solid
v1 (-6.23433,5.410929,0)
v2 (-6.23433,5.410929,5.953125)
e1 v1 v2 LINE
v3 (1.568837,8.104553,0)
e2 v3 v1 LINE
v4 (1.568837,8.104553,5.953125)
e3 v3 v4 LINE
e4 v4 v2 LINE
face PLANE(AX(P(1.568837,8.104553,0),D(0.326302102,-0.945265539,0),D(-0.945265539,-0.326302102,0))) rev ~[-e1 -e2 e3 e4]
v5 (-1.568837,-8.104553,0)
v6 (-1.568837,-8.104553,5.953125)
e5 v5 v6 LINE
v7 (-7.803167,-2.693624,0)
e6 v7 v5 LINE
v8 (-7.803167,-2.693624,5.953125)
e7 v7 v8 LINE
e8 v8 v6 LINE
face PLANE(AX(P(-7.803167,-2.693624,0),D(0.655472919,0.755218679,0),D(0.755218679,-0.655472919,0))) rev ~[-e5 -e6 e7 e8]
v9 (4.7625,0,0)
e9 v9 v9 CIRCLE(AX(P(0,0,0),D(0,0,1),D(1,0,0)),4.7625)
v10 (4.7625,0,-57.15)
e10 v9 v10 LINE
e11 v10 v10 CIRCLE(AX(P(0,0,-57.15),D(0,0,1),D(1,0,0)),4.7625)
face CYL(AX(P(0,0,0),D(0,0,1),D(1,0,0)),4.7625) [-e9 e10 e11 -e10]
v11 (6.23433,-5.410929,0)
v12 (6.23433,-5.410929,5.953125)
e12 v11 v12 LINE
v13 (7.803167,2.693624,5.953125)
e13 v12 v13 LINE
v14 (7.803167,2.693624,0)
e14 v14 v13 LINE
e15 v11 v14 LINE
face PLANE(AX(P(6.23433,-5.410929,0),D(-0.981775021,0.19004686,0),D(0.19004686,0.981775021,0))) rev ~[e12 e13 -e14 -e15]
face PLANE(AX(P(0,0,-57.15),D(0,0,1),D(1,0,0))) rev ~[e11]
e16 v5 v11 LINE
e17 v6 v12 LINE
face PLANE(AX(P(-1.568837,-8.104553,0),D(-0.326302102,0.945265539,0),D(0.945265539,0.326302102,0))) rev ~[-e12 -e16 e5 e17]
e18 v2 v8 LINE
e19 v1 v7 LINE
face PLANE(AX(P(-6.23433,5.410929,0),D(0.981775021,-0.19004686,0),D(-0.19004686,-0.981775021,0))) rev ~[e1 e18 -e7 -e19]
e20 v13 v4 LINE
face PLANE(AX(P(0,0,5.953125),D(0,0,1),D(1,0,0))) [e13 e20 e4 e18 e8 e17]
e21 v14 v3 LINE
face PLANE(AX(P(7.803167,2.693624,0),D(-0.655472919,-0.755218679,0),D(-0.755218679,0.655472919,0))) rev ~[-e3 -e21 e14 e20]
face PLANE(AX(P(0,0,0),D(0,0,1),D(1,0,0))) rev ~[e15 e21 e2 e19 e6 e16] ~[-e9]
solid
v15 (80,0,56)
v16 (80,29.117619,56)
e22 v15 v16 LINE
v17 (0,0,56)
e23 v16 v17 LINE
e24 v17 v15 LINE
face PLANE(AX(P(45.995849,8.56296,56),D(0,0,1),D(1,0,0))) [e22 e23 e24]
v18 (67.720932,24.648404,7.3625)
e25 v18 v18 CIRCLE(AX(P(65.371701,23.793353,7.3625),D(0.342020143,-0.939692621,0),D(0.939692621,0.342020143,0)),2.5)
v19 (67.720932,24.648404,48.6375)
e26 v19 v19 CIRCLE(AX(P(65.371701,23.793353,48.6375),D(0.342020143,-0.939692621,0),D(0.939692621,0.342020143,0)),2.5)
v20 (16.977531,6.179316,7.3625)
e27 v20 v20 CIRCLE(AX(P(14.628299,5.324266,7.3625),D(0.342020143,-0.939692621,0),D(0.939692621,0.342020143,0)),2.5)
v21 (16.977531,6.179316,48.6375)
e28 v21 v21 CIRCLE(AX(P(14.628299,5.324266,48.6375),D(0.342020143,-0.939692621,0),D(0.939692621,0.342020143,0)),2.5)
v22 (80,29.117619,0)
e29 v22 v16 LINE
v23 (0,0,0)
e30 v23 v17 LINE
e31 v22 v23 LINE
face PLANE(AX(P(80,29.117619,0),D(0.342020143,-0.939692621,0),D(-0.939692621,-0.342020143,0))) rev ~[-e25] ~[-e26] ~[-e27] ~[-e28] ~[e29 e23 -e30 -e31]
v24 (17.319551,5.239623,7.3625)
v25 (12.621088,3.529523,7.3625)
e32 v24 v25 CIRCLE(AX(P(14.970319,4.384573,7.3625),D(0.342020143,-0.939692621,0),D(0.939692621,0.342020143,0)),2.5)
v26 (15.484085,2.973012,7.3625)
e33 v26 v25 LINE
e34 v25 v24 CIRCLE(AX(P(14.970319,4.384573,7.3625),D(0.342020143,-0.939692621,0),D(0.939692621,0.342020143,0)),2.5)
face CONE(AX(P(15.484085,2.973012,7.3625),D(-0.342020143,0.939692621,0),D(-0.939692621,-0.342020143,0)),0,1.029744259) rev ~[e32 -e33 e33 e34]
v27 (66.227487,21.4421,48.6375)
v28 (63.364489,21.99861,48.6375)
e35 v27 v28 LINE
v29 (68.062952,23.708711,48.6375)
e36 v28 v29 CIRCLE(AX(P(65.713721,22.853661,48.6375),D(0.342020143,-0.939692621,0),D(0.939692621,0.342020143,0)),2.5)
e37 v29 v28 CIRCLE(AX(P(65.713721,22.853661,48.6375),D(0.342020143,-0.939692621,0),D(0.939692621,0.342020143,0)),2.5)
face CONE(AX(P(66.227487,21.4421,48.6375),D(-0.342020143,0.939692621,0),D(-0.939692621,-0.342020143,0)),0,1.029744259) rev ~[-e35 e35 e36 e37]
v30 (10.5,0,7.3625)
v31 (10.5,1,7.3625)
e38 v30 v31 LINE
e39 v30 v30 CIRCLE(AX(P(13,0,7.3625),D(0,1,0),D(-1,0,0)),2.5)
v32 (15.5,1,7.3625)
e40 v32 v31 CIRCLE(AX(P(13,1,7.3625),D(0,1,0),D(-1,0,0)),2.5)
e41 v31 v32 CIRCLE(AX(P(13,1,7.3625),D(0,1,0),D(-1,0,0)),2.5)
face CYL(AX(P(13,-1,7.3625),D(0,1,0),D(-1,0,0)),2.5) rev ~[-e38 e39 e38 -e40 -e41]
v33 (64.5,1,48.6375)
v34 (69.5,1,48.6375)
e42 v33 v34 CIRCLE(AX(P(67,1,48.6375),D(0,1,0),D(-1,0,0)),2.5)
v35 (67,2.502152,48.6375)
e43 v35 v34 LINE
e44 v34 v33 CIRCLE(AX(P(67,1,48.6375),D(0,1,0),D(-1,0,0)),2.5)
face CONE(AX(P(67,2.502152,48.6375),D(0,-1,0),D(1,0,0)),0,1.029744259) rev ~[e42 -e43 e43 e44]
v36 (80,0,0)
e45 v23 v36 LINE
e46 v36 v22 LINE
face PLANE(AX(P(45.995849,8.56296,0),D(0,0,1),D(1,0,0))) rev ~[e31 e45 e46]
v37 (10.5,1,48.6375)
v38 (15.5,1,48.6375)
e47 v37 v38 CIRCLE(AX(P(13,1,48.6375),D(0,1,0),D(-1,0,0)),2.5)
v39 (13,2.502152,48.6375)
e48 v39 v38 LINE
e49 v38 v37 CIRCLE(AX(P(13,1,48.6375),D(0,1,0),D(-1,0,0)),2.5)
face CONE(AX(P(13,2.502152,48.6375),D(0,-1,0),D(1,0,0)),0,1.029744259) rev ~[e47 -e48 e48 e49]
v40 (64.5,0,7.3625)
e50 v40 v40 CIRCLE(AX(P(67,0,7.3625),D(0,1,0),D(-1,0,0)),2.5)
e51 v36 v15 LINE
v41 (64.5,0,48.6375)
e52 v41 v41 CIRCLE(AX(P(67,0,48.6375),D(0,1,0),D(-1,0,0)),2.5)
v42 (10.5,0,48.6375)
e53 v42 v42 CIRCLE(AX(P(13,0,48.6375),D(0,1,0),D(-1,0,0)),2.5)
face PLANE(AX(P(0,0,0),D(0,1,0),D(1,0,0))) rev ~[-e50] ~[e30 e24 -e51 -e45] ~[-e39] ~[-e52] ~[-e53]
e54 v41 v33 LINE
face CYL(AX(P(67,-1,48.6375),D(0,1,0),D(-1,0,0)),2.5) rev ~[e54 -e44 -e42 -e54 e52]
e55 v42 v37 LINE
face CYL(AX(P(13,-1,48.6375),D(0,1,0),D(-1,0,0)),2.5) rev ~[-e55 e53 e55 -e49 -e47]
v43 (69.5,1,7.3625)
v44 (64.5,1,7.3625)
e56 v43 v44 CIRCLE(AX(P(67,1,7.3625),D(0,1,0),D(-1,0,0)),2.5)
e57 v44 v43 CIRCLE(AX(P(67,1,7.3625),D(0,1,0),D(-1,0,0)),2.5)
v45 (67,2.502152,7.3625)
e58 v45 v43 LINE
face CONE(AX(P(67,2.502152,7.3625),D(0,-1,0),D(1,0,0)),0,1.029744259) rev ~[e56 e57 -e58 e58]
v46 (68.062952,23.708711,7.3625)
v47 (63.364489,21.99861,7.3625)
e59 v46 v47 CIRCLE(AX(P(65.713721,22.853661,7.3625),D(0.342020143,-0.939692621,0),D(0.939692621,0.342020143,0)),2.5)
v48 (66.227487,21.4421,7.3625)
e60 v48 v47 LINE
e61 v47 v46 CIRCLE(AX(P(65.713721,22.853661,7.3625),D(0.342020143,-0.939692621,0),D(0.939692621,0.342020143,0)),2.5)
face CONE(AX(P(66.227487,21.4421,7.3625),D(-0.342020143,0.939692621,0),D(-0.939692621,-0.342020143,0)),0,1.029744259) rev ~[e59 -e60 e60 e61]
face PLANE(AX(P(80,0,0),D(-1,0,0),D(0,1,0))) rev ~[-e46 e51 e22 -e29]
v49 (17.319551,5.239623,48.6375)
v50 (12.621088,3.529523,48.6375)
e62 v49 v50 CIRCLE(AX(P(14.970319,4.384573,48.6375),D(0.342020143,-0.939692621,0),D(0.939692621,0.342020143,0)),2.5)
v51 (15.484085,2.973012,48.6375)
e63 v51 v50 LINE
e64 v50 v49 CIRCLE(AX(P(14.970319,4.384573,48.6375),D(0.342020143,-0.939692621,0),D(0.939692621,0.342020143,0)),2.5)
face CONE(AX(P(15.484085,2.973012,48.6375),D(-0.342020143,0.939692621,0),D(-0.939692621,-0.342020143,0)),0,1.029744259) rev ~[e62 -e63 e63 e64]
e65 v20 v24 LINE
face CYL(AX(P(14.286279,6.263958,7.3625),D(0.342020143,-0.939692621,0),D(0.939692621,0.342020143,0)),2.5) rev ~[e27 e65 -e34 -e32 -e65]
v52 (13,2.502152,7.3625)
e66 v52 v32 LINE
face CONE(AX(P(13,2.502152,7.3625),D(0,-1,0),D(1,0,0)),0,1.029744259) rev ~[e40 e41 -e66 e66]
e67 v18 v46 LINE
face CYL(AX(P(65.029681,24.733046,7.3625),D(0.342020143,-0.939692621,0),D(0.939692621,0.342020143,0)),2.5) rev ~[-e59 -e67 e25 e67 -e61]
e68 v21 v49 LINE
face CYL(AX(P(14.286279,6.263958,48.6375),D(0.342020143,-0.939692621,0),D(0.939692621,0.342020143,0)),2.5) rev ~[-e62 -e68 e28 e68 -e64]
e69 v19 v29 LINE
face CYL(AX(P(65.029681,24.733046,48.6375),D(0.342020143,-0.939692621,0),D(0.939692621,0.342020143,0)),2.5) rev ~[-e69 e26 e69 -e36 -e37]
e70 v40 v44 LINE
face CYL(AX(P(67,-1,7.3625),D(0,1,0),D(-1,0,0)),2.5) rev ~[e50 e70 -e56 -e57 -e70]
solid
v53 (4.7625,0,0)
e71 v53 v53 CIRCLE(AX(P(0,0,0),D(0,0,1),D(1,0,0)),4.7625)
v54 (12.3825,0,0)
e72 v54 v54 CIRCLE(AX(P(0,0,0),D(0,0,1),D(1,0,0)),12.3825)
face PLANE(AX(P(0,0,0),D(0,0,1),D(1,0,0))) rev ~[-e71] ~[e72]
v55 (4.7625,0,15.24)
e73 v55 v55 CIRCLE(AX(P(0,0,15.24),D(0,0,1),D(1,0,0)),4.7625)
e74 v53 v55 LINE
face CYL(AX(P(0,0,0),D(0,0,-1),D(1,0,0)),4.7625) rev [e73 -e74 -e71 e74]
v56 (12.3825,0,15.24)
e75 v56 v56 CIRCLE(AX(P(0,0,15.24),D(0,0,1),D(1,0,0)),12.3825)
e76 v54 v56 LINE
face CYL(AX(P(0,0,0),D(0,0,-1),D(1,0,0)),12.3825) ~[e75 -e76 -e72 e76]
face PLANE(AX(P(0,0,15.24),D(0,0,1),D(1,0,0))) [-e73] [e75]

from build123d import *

# Parameters (mm, degrees)
F0_R           = 12.3825
F0_R_2         = 4.7625
F1_DEPTH       = 15.24
F2_R           = 4.7625
F3_DEPTH       = 5.953125
F4_DEPTH       = 57.15
F6_DEPTH       = 56
F9_D           = 5
F9_DEPTH       = 1
F9_TIP         = 1.5021515476
F9_ON_F8_D     = 5
F9_ON_F8_DEPTH = 1
F9_ON_F8_TIP   = 1.5021515476


# Not quite as in the source:
# - a length typed as a fraction of an inch, garbled in the dataset ("3 / 203.2 mm" for 3/8 in), is restored


with BuildPart() as f1:
    # F0 (on Top) → F1 (new body)
    with BuildSketch(Plane.XY):
        Circle(F0_R)
        Circle(F0_R_2, mode=Mode.SUBTRACT)
    extrude(amount=F1_DEPTH)


with BuildPart() as f3:
    # F2 (on Top) → F3 (new body)
    with BuildSketch(Plane.XY):
        Polygon((-1.5688368276, -8.1045527951), (6.234330193, -5.4109289447), (7.8031670207, 2.6936238504), (1.5688368276, 8.1045527951), (-6.234330193, 5.4109289447), (-7.8031670207, -2.6936238504), align=None)
        Circle(F2_R, mode=Mode.SUBTRACT)
        Circle(F2_R)
    extrude(amount=F3_DEPTH)

    # F2 (on Top) → F4 (join)
    with BuildSketch(Plane.XY):
        Circle(F2_R)
    extrude(amount=-F4_DEPTH)


with BuildPart() as f6:
    # F5 (on Top) → F6 (new body)
    with BuildSketch(Plane.XY):
        Polygon((80, 29.1176187413), (0, 0), (80, 0), align=None)
    extrude(amount=F6_DEPTH)

    # F9
    with Locations(Plane(origin=(0, 0, 0), x_dir=(-0.9396926208, -0.3420201433, 0), z_dir=(-0.3420201433, 0.9396926208, 0))):
        with Locations((-15.567110899, 48.6375), (-15.567110899, 7.3625), (-69.567110899, 7.3625), (-69.567110899, 48.6375)):
            Hole(F9_D / 2, depth=F9_DEPTH)
            with Locations((0, 0, -(F9_DEPTH + F9_TIP / 2))):  # 118° drill point
                Cone(0, F9_D / 2, F9_TIP, mode=Mode.SUBTRACT)

    # F9 on F8
    with Locations(Plane.XZ):
        with Locations((13, 48.6375), (13, 7.3625), (67, 48.6375), (67, 7.3625)):
            Hole(F9_ON_F8_D / 2, depth=F9_ON_F8_DEPTH)
            with Locations((0, 0, -(F9_ON_F8_DEPTH + F9_ON_F8_TIP / 2))):  # 118° drill point
                Cone(0, F9_ON_F8_D / 2, F9_ON_F8_TIP, mode=Mode.SUBTRACT)


solid = Compound([f1.part, f3.part, f6.part])
